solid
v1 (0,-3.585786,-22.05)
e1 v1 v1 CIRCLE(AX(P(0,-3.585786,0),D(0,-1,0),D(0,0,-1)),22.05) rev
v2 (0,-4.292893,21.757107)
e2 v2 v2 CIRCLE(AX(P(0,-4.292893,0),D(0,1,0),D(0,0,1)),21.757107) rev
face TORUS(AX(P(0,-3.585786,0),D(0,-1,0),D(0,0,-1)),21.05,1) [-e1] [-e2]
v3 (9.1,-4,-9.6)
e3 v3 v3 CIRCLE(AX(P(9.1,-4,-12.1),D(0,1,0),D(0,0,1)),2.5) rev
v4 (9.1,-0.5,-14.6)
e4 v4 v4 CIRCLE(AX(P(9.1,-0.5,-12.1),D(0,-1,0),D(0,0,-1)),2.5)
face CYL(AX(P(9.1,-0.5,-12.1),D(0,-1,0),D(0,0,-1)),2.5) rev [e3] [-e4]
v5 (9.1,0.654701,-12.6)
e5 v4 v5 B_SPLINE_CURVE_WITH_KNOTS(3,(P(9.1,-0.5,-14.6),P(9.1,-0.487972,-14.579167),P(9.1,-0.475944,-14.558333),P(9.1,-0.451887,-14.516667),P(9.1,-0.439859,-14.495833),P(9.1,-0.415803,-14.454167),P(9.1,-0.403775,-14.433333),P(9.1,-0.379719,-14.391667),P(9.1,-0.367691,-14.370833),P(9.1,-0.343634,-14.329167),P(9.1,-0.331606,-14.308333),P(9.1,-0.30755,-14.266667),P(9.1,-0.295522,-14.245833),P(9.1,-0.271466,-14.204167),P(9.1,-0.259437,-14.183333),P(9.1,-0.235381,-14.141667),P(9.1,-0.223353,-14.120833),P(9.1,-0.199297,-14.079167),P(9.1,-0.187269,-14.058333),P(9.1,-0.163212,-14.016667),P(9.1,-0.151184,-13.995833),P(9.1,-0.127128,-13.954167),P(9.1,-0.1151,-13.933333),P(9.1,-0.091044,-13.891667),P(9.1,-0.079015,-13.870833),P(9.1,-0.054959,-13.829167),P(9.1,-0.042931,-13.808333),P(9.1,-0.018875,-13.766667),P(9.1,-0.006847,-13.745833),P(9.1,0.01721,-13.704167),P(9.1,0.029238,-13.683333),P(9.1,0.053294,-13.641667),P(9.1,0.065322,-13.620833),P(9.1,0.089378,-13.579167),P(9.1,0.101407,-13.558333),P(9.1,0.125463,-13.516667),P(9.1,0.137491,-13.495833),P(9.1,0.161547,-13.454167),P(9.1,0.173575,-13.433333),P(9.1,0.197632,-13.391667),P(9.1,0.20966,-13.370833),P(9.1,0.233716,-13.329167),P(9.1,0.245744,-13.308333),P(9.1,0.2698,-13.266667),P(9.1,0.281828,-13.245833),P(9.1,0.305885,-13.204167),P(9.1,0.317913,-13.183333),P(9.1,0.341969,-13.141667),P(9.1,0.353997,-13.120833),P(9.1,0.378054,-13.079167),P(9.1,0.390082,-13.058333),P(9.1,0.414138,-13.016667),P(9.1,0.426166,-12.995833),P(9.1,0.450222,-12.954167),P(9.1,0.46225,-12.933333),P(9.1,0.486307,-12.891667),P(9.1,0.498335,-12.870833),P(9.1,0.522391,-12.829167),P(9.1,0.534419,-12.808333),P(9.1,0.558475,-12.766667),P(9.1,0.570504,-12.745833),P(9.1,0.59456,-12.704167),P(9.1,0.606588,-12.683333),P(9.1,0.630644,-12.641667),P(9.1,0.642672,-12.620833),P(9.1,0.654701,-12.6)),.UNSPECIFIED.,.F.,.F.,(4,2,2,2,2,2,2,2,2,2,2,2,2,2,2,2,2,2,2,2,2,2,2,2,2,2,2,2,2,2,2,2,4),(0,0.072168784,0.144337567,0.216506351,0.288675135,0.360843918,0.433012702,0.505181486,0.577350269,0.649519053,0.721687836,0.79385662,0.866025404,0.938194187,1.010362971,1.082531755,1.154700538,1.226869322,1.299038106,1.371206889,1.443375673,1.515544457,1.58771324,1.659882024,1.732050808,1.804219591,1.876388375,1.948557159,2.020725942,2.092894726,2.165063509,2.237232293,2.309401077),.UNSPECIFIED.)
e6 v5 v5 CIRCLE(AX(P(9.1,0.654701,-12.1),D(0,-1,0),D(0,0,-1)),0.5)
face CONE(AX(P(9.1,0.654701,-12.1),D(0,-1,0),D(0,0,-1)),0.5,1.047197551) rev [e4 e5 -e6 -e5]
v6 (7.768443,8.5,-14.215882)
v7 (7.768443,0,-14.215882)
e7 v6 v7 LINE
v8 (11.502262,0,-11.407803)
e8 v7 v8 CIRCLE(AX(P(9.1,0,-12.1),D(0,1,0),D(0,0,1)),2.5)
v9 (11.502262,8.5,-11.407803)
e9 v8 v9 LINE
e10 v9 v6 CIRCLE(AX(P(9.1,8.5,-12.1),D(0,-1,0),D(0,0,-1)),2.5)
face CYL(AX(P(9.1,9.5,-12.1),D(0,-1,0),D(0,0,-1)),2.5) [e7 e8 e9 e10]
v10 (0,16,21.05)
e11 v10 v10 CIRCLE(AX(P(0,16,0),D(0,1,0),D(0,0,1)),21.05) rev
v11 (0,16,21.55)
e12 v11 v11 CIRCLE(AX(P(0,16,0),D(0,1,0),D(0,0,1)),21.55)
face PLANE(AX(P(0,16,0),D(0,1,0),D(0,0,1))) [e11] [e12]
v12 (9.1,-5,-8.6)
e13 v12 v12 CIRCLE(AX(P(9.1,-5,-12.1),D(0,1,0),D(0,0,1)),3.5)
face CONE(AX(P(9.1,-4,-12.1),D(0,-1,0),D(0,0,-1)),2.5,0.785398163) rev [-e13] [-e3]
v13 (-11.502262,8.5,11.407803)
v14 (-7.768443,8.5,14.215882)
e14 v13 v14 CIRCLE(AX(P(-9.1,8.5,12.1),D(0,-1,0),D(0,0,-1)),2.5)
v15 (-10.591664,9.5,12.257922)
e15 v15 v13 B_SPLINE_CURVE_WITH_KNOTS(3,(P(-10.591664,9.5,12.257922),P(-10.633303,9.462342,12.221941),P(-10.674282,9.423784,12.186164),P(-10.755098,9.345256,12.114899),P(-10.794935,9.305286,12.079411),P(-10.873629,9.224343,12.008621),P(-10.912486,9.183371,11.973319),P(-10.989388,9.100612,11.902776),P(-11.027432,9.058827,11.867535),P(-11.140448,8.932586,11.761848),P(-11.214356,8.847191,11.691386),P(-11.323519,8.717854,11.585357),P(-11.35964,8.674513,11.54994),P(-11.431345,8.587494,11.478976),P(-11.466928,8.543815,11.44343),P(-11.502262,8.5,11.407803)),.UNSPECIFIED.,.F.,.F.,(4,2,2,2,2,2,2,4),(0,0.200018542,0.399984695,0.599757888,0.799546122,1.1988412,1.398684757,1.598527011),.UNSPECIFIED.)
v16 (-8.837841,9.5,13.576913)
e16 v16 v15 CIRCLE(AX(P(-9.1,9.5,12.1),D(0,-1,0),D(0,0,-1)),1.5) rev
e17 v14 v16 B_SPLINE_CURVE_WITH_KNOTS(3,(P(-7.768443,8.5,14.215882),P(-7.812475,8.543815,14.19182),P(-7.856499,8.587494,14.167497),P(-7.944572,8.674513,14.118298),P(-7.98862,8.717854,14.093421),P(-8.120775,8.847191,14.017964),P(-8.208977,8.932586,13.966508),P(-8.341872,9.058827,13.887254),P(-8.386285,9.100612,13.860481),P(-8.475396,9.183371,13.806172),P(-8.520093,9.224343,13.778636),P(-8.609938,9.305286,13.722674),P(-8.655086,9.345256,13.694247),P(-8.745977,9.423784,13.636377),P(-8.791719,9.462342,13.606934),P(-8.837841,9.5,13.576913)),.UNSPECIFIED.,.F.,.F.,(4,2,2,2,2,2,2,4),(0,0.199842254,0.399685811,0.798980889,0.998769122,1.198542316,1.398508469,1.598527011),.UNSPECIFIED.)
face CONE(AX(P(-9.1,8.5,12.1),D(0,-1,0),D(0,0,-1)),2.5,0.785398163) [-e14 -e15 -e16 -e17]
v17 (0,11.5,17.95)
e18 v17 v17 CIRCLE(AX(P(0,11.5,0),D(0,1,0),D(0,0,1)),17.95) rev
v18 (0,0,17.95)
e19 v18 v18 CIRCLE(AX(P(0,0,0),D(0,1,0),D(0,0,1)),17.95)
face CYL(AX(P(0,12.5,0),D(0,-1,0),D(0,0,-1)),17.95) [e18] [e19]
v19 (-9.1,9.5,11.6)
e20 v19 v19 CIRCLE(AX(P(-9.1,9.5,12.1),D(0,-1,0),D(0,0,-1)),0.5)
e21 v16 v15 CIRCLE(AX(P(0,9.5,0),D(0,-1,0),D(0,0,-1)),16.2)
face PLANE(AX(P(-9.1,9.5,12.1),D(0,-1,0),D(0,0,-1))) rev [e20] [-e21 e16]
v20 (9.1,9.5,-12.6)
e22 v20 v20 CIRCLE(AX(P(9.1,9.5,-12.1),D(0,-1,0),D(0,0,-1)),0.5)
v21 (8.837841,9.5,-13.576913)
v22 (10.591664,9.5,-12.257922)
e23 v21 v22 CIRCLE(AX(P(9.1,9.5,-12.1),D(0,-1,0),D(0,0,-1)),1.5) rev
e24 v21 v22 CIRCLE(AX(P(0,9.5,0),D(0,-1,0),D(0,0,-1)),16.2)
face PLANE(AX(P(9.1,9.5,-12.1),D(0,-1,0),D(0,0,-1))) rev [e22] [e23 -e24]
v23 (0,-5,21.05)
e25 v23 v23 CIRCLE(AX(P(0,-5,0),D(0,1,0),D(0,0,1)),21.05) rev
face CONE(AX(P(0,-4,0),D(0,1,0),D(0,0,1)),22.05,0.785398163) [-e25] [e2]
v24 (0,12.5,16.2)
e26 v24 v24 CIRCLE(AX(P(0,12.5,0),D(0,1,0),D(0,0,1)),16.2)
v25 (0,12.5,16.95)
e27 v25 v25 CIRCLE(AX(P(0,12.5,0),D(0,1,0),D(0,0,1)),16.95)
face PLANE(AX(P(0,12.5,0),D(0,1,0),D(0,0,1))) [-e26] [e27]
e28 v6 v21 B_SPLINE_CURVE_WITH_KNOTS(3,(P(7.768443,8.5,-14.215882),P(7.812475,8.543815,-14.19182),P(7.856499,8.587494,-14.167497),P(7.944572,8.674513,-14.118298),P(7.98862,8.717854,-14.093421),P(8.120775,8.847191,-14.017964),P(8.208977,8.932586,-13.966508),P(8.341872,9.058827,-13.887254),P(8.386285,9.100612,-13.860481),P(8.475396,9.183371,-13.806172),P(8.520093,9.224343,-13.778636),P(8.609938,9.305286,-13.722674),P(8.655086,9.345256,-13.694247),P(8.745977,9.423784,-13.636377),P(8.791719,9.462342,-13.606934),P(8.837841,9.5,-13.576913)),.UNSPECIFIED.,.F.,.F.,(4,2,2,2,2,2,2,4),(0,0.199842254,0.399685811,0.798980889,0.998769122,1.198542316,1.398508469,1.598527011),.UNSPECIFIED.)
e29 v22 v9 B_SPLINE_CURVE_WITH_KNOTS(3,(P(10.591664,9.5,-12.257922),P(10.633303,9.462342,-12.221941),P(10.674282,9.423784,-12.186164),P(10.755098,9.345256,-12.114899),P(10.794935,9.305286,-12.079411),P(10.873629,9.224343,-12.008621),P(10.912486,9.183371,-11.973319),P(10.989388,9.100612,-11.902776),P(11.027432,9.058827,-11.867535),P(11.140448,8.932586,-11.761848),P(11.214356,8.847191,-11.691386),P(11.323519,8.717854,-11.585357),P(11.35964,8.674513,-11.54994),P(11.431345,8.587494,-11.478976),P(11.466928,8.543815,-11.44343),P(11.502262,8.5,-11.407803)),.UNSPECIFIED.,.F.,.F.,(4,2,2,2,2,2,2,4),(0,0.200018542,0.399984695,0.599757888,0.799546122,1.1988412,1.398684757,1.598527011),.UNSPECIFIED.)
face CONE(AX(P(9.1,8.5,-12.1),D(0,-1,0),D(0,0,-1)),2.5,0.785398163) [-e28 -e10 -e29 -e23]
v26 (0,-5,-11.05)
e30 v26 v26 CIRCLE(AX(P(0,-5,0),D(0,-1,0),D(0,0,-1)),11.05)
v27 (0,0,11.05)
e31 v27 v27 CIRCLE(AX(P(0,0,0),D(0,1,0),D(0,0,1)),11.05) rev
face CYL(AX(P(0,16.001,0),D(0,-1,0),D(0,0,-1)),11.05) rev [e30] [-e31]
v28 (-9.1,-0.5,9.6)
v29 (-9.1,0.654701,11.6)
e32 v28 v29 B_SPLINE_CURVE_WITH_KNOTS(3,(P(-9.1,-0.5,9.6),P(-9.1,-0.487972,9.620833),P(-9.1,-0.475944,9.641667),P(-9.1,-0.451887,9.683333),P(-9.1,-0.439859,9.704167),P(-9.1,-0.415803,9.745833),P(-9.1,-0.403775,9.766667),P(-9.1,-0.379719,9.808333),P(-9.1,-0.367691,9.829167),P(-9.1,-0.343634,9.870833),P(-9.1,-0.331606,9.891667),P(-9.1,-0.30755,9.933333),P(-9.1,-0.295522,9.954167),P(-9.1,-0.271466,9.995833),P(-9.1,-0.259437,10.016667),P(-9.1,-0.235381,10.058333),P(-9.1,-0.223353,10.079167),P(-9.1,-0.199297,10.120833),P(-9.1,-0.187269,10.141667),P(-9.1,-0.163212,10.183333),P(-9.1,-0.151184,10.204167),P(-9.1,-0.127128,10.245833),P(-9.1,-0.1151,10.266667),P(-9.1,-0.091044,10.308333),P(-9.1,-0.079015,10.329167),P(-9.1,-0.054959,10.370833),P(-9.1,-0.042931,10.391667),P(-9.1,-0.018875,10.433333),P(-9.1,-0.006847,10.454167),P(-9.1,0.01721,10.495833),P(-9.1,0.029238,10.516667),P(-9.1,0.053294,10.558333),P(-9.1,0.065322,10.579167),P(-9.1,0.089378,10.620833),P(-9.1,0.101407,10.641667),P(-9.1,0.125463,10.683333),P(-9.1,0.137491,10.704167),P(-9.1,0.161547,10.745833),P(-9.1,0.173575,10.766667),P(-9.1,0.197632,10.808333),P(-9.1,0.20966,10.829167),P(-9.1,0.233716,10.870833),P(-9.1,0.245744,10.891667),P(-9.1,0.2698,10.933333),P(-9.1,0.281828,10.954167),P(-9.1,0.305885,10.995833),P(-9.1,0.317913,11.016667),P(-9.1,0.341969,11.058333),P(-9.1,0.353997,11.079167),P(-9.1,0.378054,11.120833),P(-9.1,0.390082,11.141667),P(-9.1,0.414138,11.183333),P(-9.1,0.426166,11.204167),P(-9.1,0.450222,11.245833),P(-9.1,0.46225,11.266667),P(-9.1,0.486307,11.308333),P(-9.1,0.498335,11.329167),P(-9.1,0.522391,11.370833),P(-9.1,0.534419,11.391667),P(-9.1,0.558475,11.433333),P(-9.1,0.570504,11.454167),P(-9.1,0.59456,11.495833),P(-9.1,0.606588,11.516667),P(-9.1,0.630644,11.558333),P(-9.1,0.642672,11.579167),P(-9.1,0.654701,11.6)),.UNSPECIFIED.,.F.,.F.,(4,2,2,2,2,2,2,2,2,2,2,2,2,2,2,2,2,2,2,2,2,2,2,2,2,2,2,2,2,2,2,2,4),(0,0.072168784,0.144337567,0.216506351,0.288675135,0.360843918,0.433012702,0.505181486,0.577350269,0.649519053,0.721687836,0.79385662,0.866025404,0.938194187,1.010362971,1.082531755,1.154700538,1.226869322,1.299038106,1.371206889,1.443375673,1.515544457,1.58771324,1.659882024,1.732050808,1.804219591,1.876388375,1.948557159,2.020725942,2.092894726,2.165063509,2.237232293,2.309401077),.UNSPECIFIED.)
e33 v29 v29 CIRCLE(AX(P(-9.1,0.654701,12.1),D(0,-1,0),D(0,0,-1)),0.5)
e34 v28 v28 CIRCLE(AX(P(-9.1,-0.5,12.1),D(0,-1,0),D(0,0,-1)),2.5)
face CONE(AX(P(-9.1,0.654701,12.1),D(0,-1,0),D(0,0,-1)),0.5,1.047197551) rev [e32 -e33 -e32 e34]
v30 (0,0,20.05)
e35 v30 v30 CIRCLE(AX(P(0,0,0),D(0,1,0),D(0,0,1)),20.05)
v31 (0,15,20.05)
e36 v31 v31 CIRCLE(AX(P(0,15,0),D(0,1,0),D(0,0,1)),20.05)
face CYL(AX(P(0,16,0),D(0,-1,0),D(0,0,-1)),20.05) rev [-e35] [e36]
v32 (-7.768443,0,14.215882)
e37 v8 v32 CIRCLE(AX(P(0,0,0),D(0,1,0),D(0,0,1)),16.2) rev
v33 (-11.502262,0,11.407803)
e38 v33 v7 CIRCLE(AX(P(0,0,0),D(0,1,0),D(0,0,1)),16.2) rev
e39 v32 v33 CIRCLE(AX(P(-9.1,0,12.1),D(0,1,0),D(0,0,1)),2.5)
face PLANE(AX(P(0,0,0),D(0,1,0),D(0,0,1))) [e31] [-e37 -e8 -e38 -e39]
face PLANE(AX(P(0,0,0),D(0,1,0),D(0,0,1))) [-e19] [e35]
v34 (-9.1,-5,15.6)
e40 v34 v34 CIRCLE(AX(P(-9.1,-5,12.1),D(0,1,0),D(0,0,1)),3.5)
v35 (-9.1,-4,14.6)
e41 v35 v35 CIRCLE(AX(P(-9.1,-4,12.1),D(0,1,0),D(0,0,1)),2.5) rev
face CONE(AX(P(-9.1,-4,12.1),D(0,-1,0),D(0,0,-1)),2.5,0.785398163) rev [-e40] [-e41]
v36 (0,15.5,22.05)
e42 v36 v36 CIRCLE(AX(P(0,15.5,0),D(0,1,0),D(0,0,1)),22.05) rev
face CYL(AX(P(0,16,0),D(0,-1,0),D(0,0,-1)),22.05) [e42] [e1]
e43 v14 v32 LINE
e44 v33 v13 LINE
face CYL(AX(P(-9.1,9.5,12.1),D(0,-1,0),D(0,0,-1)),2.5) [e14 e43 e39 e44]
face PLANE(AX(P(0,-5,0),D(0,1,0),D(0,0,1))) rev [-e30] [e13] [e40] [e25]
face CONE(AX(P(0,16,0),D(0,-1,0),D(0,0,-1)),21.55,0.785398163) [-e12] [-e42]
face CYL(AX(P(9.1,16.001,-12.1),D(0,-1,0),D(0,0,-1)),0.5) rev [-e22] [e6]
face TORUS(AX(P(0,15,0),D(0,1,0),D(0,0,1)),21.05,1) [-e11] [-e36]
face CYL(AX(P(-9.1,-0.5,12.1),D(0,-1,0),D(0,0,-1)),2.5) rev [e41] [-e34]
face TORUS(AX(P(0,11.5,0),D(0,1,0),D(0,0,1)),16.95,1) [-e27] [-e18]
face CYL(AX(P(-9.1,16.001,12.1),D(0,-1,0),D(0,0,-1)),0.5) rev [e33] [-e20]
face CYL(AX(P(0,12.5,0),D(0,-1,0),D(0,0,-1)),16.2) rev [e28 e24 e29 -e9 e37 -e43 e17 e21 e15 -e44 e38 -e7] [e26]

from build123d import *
from OCP.BRepFilletAPI import BRepFilletAPI_MakeChamfer

# Parameters (mm, degrees)
CROQUIS1_R              = 22.05
CROQUIS1_R_2            = 20.05
SALIENTE_EXTRUIR1_DEPTH = 16
CROQUIS1_4_R            = 17.95
CROQUIS1_4_R_2          = 16.2
SALIENTE_EXTRUIR2_DEPTH = 12.5
SALIENTE_EXTRUIR4_START = -5
CROQUIS1_6_R            = 22.05
CROQUIS1_6_R_2          = 20.05
CROQUIS1_6_R_3          = 17.95
CROQUIS1_6_R_4          = 16.2
SALIENTE_EXTRUIR4_DEPTH = 5
CORTAR_EXTRUIR1_REACH   = 39.595
CROQUIS4_R              = 11.05
CROQUIS4_R_2            = 0.5
CROQUIS5_R              = 2.5
CROQUIS5_R_2            = 0.5
CORTAR_EXTRUIR2_DEPTH   = 4.5
CROQUIS6_R              = 2.5
CROQUIS6_R_2            = 0.5
SALIENTE_EXTRUIR5_DEPTH = 10
REDONDEO2_R             = 1
CHAFL_N1_SIZE           = 1
REDONDEO3_R             = 1
CHAFL_N2_SIZE           = 0.5
CHAFL_N3_SIZE           = 2
CHAFL_N3_SIZE_2         = 1.154700538


with BuildPart() as part:
    # Croquis1 → Saliente-Extruir1 (new body)
    with BuildSketch(Plane(origin=(0, 0, 0), x_dir=(1, 0, 0), z_dir=(0, 1, 0))):
        with Locations(Location((0, 0, 0), (0, 0, 270))):
            Circle(CROQUIS1_R)
        with Locations(Location((0, 0, 0), (0, 0, 270))):
            Circle(CROQUIS1_R_2, mode=Mode.SUBTRACT)
    extrude(amount=SALIENTE_EXTRUIR1_DEPTH)



with BuildPart() as body_2:
    # Croquis1<4> → Saliente-Extruir2 (new body)
    with BuildSketch(Plane(origin=(0, 0, 0), x_dir=(1, 0, 0), z_dir=(0, 1, 0))):
        with Locations(Location((0, 0, 0), (0, 0, 270))):
            Circle(CROQUIS1_4_R)
        with Locations(Location((0, 0, 0), (0, 0, 270))):
            Circle(CROQUIS1_4_R_2, mode=Mode.SUBTRACT)
    extrude(amount=SALIENTE_EXTRUIR2_DEPTH)


with BuildPart() as part_1:
    add(part.part)

    add(body_2.part)  # Saliente-Extruir4 merges body 2
    # Croquis1<6> → Saliente-Extruir4 (add)
    # profile 1 of 4: a face of its own
    with BuildSketch(Plane(origin=(0, 0, 0), x_dir=(1, 0, 0), z_dir=(0, 1, 0)).offset(SALIENTE_EXTRUIR4_START)):
        with Locations(Location((0, 0, 0), (0, 0, 270))):
            Circle(CROQUIS1_6_R)
        with Locations(Location((0, 0, 0), (0, 0, 270))):
            Circle(CROQUIS1_6_R_2, mode=Mode.SUBTRACT)
    # profile 2 of 4: a face of its own
    with BuildSketch(Plane(origin=(0, 0, 0), x_dir=(1, 0, 0), z_dir=(0, 1, 0)).offset(SALIENTE_EXTRUIR4_START)):
        with Locations(Location((0, 0, 0), (0, 0, 270))):
            Circle(CROQUIS1_6_R_2)
        with Locations(Location((0, 0, 0), (0, 0, 270))):
            Circle(CROQUIS1_6_R_3, mode=Mode.SUBTRACT)
    # profile 3 of 4: a face of its own
    with BuildSketch(Plane(origin=(0, 0, 0), x_dir=(1, 0, 0), z_dir=(0, 1, 0)).offset(SALIENTE_EXTRUIR4_START)):
        with Locations(Location((0, 0, 0), (0, 0, 270))):
            Circle(CROQUIS1_6_R_3)
        with Locations(Location((0, 0, 0), (0, 0, 270))):
            Circle(CROQUIS1_6_R_4, mode=Mode.SUBTRACT)
    # profile 4 of 4: a face of its own
    with BuildSketch(Plane(origin=(0, 0, 0), x_dir=(1, 0, 0), z_dir=(0, 1, 0)).offset(SALIENTE_EXTRUIR4_START)):
        with Locations(Location((0, 0, 0), (0, 0, 270))):
            Circle(CROQUIS1_6_R_4)
    extrude(amount=SALIENTE_EXTRUIR4_DEPTH)

    # Croquis4 → Cortar-Extruir1 (cut, up to next)
    with BuildSketch(Plane.XZ.offset(5), mode=Mode.PRIVATE) as cortar_extruir1_sk1:
        with Locations(Location((0, 0, 0), (0, 0, 270))):
            Circle(CROQUIS4_R)
    cortar_extruir1_tool1 = extrude(cortar_extruir1_sk1.sketch, amount=-CORTAR_EXTRUIR1_REACH, mode=Mode.PRIVATE) & part_1.part
    # Croquis4 → Cortar-Extruir1 (cut, up to next)
    with BuildSketch(Plane.XZ.offset(5), mode=Mode.PRIVATE) as cortar_extruir1_sk2:
        with Locations(Location((-9.1, 12.1, 0), (0, 0, 270))):
            Circle(CROQUIS4_R_2)
    cortar_extruir1_tool2 = extrude(cortar_extruir1_sk2.sketch, amount=-CORTAR_EXTRUIR1_REACH, mode=Mode.PRIVATE) & part_1.part
    # Croquis4 → Cortar-Extruir1 (cut, up to next)
    with BuildSketch(Plane.XZ.offset(5), mode=Mode.PRIVATE) as cortar_extruir1_sk3:
        with Locations(Location((9.1, -12.1, 0), (0, 0, 270))):
            Circle(CROQUIS4_R_2)
    cortar_extruir1_tool3 = extrude(cortar_extruir1_sk3.sketch, amount=-CORTAR_EXTRUIR1_REACH, mode=Mode.PRIVATE) & part_1.part
    add(cortar_extruir1_tool1.solids().sort_by_distance((0, -5, 0))[0], mode=Mode.SUBTRACT)
    add(cortar_extruir1_tool2.solids().sort_by_distance((-9.1, -5, 12.1))[0], mode=Mode.SUBTRACT)
    add(cortar_extruir1_tool3.solids().sort_by_distance((9.1, -5, -12.1))[0], mode=Mode.SUBTRACT)

    # Croquis5 → Cortar-Extruir2 (cut)
    # profile 1 of 2: a face of its own
    with BuildSketch(Plane.XZ.offset(5)):
        with Locations(Location((-9.1, 12.1, 0), (0, 0, 270))):
            Circle(CROQUIS5_R)
        with Locations(Location((-9.1, 12.1, 0), (0, 0, 270))):
            Circle(CROQUIS5_R_2, mode=Mode.SUBTRACT)
    # profile 2 of 2: a face of its own
    with BuildSketch(Plane.XZ.offset(5)):
        with Locations(Location((9.1, -12.1, 0), (0, 0, 270))):
            Circle(CROQUIS5_R)
        with Locations(Location((9.1, -12.1, 0), (0, 0, 270))):
            Circle(CROQUIS5_R_2, mode=Mode.SUBTRACT)
    extrude(amount=-CORTAR_EXTRUIR2_DEPTH, mode=Mode.SUBTRACT)

    # Croquis6 → Saliente-Extruir5 (add)
    # profile 1 of 2: a face of its own
    with BuildSketch(Plane.XZ.offset(0.5)):
        with Locations(Location((-9.1, 12.1, 0), (0, 0, 270))):
            Circle(CROQUIS6_R)
        with Locations(Location((-9.1, 12.1, 0), (0, 0, 270))):
            Circle(CROQUIS6_R_2, mode=Mode.SUBTRACT)
    # profile 2 of 2: a face of its own
    with BuildSketch(Plane.XZ.offset(0.5)):
        with Locations(Location((9.1, -12.1, 0), (0, 0, 270))):
            Circle(CROQUIS6_R)
        with Locations(Location((9.1, -12.1, 0), (0, 0, 270))):
            Circle(CROQUIS6_R_2, mode=Mode.SUBTRACT)
    extrude(amount=-SALIENTE_EXTRUIR5_DEPTH)

    # Redondeo2
    redondeo2_edges = [part_1.edges().sort_by_distance(p)[0] for p in [
        (0, 12.5, -17.95),
        (0, 16, -20.05),
    ]]
    fillet(redondeo2_edges, radius=REDONDEO2_R)

    # Chaflán1
    chafl_n1_edges = [part_1.edges().sort_by_distance(p)[0] for p in [
        (-9.1, -5, 14.6),
        (9.1, -5, -9.6),
        (-7.597359303, 9.5, 10.101983249),
        (7.597359303, 9.5, -10.101983249),
        (0, -5, -22.05),
    ]]
    chamfer(chafl_n1_edges, length=CHAFL_N1_SIZE)

    # Redondeo3
    redondeo3_edges = [part_1.edges().sort_by_distance(p)[0] for p in [
        (0, -4, -22.05),
    ]]
    fillet(redondeo3_edges, radius=REDONDEO3_R)

    # Chaflán2
    chafl_n2_edges = [part_1.edges().sort_by_distance(p)[0] for p in [
        (0, 16, -22.05),
    ]]
    chamfer(chafl_n2_edges, length=CHAFL_N2_SIZE)

    # Chaflán3
    chafl_n3_edges_1 = [part_1.edges().sort_by_distance(p)[0] for p in [
        (-9.1, -0.5, 12.6),
    ]]
    chafl_n3_side_1 = [part_1.faces().sort_by_distance(p)[0] for p in [
        (-9.1, -0.5, 12.623094011),
    ]]
    chafl_n3_edges_2 = [part_1.edges().sort_by_distance(p)[0] for p in [
        (9.1, -0.5, -11.6),
    ]]
    chafl_n3_side_2 = [part_1.faces().sort_by_distance(p)[0] for p in [
        (9.1, -0.5, -11.576905989),
    ]]
    chafl_n3 = BRepFilletAPI_MakeChamfer(part_1.part.solid().wrapped)
    for e in chafl_n3_edges_1:
        chafl_n3.Add(CHAFL_N3_SIZE - 0.0001, CHAFL_N3_SIZE_2 - 0.0001, e.wrapped, chafl_n3_side_1[0].wrapped)
    for e in chafl_n3_edges_2:
        chafl_n3.Add(CHAFL_N3_SIZE - 0.0001, CHAFL_N3_SIZE_2 - 0.0001, e.wrapped, chafl_n3_side_2[0].wrapped)
    add(Compound.cast(chafl_n3.Shape()), mode=Mode.REPLACE)  # a hair under: the kernel refuses the full size


solid = part_1.part
